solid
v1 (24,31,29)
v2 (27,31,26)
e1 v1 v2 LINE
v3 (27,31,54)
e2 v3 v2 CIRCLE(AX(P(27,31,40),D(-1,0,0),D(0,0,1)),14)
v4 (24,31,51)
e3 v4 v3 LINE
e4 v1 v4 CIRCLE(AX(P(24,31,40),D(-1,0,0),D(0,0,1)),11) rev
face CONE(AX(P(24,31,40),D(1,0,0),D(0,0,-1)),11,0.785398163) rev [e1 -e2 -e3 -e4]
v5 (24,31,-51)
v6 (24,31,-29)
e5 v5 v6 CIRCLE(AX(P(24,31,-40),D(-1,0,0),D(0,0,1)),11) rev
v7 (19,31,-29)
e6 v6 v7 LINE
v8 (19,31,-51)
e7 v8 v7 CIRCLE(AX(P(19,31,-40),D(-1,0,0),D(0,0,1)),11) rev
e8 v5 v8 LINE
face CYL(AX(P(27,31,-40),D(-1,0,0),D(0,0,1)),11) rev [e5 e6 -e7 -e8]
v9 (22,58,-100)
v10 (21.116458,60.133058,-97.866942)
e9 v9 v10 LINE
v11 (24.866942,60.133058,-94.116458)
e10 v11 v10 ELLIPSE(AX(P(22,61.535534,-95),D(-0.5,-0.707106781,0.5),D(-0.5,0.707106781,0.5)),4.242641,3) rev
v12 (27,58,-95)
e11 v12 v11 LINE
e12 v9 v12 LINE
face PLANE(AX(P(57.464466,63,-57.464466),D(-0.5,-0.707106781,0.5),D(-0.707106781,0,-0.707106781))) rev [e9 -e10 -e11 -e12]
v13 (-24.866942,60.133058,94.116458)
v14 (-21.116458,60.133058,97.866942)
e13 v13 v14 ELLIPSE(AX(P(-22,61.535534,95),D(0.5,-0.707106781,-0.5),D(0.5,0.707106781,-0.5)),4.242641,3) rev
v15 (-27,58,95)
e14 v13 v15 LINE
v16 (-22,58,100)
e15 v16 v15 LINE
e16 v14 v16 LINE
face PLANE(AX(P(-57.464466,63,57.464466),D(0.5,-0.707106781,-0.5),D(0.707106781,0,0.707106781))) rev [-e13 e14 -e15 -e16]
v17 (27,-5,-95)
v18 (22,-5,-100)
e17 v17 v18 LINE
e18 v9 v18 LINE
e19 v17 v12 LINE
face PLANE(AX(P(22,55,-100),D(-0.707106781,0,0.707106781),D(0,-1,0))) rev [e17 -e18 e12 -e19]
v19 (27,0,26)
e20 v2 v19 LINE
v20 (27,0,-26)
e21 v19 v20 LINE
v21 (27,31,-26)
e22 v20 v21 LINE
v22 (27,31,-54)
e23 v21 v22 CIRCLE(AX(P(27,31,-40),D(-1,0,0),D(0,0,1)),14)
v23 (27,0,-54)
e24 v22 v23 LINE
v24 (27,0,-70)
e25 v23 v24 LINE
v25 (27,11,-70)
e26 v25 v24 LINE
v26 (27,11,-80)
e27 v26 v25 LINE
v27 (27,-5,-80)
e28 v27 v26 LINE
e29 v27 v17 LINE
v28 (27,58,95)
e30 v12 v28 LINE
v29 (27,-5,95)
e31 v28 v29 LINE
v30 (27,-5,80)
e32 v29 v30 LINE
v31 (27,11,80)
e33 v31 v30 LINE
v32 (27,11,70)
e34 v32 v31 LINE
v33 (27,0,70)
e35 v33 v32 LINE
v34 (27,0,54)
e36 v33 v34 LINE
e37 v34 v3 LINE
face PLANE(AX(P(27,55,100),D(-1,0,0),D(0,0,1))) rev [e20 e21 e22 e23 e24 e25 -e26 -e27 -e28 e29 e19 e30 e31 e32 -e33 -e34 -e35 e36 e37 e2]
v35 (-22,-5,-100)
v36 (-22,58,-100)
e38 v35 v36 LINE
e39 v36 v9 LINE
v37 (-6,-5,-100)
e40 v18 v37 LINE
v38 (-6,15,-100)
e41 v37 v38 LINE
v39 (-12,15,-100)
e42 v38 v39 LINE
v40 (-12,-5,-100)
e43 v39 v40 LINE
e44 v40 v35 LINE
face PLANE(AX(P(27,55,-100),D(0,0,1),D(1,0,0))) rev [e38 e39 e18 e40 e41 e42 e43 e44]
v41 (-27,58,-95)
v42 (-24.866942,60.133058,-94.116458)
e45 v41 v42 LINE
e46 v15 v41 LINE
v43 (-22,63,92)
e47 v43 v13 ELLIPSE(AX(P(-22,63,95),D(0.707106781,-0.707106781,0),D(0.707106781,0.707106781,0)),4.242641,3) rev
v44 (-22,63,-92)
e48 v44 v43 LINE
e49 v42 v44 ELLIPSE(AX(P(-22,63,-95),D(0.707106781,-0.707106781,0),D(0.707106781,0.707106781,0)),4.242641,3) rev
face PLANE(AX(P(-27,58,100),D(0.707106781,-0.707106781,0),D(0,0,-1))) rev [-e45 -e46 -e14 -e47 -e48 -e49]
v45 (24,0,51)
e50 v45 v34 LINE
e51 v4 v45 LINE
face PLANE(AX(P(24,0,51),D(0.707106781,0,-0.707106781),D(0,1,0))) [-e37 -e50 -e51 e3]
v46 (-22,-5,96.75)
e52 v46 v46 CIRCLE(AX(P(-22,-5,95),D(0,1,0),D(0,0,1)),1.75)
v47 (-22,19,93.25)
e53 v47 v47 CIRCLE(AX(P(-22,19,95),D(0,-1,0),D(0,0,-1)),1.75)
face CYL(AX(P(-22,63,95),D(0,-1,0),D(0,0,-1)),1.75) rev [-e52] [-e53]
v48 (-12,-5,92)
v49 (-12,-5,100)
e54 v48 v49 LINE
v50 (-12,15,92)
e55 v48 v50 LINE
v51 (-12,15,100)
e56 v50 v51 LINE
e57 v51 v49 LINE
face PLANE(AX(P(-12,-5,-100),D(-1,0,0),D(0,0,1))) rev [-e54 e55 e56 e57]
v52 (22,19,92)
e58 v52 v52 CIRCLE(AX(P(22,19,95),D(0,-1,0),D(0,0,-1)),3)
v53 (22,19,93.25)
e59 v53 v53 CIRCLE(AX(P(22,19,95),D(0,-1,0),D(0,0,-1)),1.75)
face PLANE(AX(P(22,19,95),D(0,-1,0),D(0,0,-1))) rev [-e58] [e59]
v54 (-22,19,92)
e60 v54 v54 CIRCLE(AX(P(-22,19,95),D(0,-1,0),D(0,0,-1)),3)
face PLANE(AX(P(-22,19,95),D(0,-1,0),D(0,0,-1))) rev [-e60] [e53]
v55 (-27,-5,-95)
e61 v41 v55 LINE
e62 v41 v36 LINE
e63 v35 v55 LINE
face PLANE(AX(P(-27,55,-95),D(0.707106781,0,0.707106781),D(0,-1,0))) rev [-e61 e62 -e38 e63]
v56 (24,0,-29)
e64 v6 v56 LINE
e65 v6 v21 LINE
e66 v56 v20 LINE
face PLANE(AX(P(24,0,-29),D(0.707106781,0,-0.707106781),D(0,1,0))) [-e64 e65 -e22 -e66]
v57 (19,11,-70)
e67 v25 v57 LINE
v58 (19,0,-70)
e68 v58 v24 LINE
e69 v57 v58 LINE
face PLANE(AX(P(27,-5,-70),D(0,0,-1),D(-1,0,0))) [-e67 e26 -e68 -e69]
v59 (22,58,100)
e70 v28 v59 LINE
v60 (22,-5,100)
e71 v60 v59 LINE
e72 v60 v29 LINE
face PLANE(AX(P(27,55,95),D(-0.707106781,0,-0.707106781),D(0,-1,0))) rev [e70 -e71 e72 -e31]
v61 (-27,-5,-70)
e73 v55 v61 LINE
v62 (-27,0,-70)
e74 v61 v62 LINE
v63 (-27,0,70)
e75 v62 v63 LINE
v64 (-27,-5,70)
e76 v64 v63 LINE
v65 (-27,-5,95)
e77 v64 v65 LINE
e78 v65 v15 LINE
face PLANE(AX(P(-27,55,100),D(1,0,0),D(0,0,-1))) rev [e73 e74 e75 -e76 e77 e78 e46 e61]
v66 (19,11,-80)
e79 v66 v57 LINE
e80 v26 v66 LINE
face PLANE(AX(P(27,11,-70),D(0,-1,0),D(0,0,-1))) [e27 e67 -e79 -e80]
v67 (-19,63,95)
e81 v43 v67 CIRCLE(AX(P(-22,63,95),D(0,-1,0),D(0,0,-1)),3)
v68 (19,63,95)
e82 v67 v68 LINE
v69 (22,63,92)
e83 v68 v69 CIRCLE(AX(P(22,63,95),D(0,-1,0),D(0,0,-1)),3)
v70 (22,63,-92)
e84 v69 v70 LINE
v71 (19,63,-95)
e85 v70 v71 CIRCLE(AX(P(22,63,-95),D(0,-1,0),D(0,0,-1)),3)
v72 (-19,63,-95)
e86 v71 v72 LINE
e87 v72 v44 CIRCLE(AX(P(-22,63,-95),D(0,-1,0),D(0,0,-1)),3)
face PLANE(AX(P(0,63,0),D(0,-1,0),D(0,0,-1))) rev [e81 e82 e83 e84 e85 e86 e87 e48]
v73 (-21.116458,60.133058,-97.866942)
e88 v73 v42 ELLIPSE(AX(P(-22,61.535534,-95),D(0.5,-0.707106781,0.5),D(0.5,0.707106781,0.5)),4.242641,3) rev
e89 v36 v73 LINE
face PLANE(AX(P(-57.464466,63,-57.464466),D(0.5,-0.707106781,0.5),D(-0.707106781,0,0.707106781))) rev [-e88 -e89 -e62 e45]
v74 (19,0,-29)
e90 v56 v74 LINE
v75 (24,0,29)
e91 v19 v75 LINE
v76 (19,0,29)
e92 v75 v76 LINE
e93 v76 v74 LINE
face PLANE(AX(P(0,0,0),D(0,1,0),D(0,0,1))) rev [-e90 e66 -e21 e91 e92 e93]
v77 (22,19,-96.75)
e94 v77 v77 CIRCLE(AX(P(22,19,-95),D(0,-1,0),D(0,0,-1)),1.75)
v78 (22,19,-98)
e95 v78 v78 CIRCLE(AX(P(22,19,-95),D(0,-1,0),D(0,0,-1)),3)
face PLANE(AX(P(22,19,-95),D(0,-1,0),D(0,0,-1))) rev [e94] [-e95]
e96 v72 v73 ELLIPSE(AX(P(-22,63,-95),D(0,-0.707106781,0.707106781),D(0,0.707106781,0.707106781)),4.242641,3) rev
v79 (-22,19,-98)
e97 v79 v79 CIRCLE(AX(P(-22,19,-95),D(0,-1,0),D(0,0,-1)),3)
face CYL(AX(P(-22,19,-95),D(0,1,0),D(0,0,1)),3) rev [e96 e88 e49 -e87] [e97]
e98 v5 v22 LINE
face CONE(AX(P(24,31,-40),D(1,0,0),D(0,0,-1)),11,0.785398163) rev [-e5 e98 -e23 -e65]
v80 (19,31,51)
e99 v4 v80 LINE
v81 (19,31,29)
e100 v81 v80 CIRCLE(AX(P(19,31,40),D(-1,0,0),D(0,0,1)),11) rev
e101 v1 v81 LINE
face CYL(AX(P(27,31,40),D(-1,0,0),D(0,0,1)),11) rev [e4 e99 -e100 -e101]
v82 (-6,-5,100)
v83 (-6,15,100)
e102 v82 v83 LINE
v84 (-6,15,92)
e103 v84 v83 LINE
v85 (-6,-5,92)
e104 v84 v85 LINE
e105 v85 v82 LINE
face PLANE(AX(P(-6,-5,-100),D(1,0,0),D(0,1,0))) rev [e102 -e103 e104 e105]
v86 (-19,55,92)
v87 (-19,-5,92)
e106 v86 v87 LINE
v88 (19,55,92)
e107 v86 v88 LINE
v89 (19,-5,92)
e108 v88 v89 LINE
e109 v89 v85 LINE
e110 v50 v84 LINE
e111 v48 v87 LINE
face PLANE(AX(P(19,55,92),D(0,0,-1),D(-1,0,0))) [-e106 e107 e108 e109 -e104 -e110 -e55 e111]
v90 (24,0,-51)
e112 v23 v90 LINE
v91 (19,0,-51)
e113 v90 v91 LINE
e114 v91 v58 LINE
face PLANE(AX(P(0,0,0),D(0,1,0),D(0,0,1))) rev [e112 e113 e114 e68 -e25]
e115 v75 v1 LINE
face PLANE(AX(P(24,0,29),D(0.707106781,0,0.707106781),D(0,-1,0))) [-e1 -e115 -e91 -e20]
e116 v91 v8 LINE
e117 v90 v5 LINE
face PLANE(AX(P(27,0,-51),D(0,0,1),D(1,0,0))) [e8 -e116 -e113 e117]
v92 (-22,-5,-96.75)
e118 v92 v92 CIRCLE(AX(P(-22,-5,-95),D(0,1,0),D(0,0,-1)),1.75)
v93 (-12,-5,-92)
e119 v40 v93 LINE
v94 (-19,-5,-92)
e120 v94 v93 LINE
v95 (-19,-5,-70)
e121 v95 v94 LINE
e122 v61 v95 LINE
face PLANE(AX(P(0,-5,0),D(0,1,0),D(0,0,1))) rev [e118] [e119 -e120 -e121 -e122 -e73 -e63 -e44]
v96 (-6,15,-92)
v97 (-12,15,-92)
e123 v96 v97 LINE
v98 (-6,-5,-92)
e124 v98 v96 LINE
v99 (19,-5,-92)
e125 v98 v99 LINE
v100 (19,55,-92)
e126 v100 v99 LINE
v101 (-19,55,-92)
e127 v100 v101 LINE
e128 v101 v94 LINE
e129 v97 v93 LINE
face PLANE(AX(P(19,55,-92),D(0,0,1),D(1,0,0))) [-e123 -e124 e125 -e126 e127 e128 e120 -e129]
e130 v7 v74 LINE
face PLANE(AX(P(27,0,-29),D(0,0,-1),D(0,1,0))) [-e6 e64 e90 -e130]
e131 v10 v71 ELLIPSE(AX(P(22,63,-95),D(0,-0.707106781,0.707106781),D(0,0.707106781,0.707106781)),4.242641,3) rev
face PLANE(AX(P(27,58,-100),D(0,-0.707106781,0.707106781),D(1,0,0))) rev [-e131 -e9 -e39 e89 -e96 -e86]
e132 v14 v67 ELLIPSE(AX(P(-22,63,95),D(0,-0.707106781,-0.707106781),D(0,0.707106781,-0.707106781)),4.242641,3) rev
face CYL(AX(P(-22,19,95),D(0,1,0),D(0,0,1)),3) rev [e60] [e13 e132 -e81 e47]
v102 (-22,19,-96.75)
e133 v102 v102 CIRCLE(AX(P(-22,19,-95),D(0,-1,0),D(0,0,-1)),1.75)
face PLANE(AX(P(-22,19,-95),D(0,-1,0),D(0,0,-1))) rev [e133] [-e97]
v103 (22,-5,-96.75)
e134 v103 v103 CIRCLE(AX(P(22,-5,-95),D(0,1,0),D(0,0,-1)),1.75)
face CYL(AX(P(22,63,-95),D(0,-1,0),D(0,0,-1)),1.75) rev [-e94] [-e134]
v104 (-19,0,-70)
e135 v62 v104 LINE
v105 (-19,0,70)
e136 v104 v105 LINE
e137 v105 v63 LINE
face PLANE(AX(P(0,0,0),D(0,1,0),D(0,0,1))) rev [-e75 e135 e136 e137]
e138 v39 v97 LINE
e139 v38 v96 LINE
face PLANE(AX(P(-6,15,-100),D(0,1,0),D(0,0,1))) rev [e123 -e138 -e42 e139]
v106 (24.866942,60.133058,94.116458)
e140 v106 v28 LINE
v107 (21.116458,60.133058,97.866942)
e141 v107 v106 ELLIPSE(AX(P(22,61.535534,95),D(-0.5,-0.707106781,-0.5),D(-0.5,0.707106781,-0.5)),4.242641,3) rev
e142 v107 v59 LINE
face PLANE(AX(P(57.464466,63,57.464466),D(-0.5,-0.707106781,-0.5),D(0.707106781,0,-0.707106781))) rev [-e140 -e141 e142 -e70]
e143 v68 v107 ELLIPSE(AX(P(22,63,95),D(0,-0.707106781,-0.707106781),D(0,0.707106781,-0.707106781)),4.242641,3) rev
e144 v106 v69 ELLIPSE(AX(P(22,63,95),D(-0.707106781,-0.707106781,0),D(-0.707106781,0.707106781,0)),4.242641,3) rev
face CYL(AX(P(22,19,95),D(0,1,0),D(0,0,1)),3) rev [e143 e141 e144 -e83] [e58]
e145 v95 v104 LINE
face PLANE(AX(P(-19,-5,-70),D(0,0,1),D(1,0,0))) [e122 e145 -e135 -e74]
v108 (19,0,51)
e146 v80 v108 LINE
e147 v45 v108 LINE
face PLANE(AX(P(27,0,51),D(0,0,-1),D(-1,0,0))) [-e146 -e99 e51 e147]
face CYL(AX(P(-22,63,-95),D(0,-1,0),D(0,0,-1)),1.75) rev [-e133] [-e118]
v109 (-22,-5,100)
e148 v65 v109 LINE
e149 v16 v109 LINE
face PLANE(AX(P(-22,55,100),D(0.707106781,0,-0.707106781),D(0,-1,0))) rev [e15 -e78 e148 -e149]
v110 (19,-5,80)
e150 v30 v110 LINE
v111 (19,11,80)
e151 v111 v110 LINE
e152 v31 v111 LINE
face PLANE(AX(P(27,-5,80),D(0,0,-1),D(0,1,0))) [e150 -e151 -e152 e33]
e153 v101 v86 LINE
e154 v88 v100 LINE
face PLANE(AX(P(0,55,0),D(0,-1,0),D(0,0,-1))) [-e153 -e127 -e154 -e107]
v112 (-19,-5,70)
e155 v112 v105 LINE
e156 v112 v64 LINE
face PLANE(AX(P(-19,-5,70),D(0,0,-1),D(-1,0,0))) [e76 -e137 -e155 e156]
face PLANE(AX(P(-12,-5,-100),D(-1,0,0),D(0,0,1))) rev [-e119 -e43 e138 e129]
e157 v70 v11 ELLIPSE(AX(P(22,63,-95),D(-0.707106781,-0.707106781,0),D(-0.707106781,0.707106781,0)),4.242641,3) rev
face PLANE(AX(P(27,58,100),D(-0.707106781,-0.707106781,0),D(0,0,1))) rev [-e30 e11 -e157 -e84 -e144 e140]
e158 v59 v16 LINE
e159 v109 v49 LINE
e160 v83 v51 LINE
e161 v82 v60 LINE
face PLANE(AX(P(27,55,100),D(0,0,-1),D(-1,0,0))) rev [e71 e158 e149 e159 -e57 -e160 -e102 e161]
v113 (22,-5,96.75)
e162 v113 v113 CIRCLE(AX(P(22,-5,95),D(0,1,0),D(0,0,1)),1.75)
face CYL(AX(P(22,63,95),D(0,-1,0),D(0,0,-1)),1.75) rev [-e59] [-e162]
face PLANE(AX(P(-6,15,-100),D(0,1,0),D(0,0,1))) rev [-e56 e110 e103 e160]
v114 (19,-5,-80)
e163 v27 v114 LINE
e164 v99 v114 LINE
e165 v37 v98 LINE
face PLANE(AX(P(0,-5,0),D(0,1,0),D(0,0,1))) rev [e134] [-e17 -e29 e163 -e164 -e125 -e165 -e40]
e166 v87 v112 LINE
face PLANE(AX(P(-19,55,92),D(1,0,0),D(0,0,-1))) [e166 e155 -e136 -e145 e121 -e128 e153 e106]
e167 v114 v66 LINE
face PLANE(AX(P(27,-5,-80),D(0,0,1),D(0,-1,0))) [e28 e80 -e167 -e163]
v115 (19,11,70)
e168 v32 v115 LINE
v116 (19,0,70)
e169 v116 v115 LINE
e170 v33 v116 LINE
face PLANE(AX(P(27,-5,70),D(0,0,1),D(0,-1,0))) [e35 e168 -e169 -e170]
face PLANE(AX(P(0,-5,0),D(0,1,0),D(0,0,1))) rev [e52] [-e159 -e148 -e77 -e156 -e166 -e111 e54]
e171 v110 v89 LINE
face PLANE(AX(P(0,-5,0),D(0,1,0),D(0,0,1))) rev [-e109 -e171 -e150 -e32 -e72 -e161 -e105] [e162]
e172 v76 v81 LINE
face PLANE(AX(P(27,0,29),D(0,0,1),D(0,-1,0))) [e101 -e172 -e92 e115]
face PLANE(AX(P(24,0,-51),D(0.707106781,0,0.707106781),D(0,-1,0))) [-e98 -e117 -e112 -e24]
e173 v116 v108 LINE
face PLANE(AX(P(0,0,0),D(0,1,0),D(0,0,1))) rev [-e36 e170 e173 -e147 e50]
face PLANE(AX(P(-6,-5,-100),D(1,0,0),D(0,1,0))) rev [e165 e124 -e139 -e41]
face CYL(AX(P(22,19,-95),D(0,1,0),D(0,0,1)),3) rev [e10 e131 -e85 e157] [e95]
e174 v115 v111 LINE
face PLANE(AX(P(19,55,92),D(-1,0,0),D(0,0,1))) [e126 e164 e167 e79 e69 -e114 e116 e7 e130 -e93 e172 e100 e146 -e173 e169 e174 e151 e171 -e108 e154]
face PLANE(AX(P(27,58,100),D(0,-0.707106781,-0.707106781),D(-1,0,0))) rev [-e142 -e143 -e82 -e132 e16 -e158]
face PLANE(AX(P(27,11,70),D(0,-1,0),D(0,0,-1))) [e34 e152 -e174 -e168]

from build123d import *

# Parameters (mm, degrees)
SKETCH2_W               = 54
SKETCH2_H               = 200
SKETCH2_W_2             = 38
SKETCH2_H_2             = 184
BOSS_EXTRUDE2_DEPTH     = 55
CUT_EXTRUDE1_DEPTH      = 118.277448813
BOSS_EXTRUDE3_START     = 55
SKETCH5_W               = 54
SKETCH5_H               = 200
BOSS_EXTRUDE3_DEPTH     = 8
CUT_EXTRUDE2_DEPTH      = 122.235308388
CUT_EXTRUDE2_DEPTH_BACK = 122.235308388
SKETCH6_R               = 1.75
CUT_EXTRUDE3_START      = 63
SKETCH7_R               = 3
CUT_EXTRUDE3_DEPTH      = 44
CHAMFER1_SIZE           = 5
CHAMFER3_SIZE           = 5
CHAMFER4_SIZE           = 3
BOSS_EXTRUDE4_START     = -5
SKETCH8_R               = 1.75
BOSS_EXTRUDE4_DEPTH     = 5
CUT_EXTRUDE4_DEPTH      = 122.235308388
CUT_EXTRUDE4_DEPTH_BACK = 122.235308388
SKETCH9_W               = 6
SKETCH9_H               = 20
SKETCH10_W              = 10
SKETCH10_H              = 16
CUT_EXTRUDE5_DEPTH      = 122.235308388


with BuildPart() as part:
    # Sketch2 → Boss-Extrude2 (new body)
    with BuildSketch(Plane(origin=(0, 0, 0), x_dir=(1, 0, 0), z_dir=(0, 1, 0))):
        Rectangle(SKETCH2_W, SKETCH2_H)
        Rectangle(SKETCH2_W_2, SKETCH2_H_2, mode=Mode.SUBTRACT)
    extrude(amount=BOSS_EXTRUDE2_DEPTH)

    # Sketch3 → Cut-Extrude1 (cut, through all)
    with BuildSketch(Plane(origin=(0, 0, 0), x_dir=(0, 0, -1), z_dir=(1, 0, 0))):
        with BuildLine():
            Line((-51, 0), (-51, 31))
            ThreePointArc((-51, 31), (-40, 42), (-29, 31))
            Line((-29, 31), (-29, 0))
            Line((-29, 0), (-51, 0))
        make_face()
        with BuildLine():
            Line((51, 0), (51, 31))
            ThreePointArc((51, 31), (40, 42), (29, 31))
            Line((29, 31), (29, 0))
            Line((29, 0), (51, 0))
        make_face()
    extrude(amount=CUT_EXTRUDE1_DEPTH, mode=Mode.SUBTRACT)

    # Sketch5 → Boss-Extrude3 (add)
    with BuildSketch(Plane(origin=(0, 0, 0), x_dir=(1, 0, 0), z_dir=(0, 1, 0)).offset(BOSS_EXTRUDE3_START)):
        Rectangle(SKETCH5_W, SKETCH5_H)
    extrude(amount=BOSS_EXTRUDE3_DEPTH)

    # Sketch6 → Cut-Extrude2 (cut, two sides: drawn at the far end of the back side and taken through both)
    with BuildSketch(Plane(origin=(0, 0, 0), x_dir=(1, 0, 0), z_dir=(0, 1, 0)).offset(-CUT_EXTRUDE2_DEPTH_BACK)):
        with Locations(Location((22, -95, 0), (0, 0, 270))):
            Circle(SKETCH6_R)
        with Locations(Location((-22, -95, 0), (0, 0, 270))):
            Circle(SKETCH6_R)
        with Locations(Location((-22, 95, 0), (0, 0, 270))):
            Circle(SKETCH6_R)
        with Locations(Location((22, 95, 0), (0, 0, 270))):
            Circle(SKETCH6_R)
    extrude(amount=CUT_EXTRUDE2_DEPTH + CUT_EXTRUDE2_DEPTH_BACK, mode=Mode.SUBTRACT)

    # Sketch7 → Cut-Extrude3 (cut)
    with BuildSketch(Plane(origin=(0, 0, 0), x_dir=(1, 0, 0), z_dir=(0, 1, 0)).offset(CUT_EXTRUDE3_START)):
        with Locations(Location((-22, -95, 0), (0, 0, 90))):
            Circle(SKETCH7_R)
        with Locations(Location((-22, 95, 0), (0, 0, 90))):
            Circle(SKETCH7_R)
        with Locations(Location((22, 95, 0), (0, 0, 90))):
            Circle(SKETCH7_R)
        with Locations(Location((22, -95, 0), (0, 0, 90))):
            Circle(SKETCH7_R)
    extrude(amount=-CUT_EXTRUDE3_DEPTH, mode=Mode.SUBTRACT)

    # Chamfer1
    chamfer1_edges = [part.edges().sort_by_distance(p)[0] for p in [
        (-27, 31.5, -100),
        (27, 31.5, -100),
        (27, 31.5, 100),
        (-27, 31.5, 100),
    ]]
    chamfer(chamfer1_edges, length=CHAMFER1_SIZE)

    # Chamfer3
    # the kernel refuses this chamfer: 5 mm, written as the material it takes off along each edge
    with BuildSketch(Plane(origin=(-34.85841494, 63, 100), x_dir=(0, -0.9996219169112968, 0.0274958766105877), z_dir=(1, 0, 0))) as chamfer3_piece_1:
        Polygon((CHAMFER3_SIZE * 0.999621916911, CHAMFER3_SIZE * 0.0274958766106), (-CHAMFER3_SIZE * 0.0274958766106, CHAMFER3_SIZE * 0.999621916911), (0, 0), align=None)
    extrude(amount=69.71682988, mode=Mode.SUBTRACT)
    with BuildSketch(Plane(origin=(-27, 63, -107.85841494), x_dir=(0.9996219169112968, 0.027495876610586317, 0), z_dir=(0, 0, 1)), Plane(origin=(27, 63, 107.85841494), x_dir=(-0.9996219169112968, 0.027495876610586317, 0), z_dir=(0, 0, -1))) as chamfer3_piece_2:
        Polygon((CHAMFER3_SIZE * 0.999621916911, -CHAMFER3_SIZE * 0.0274958766106), (-CHAMFER3_SIZE * 0.0274958766106, -CHAMFER3_SIZE * 0.999621916911), (0, 0), align=None)
    extrude(amount=215.71682988, mode=Mode.SUBTRACT)
    with BuildSketch(Plane(origin=(34.85841494, 63, -100), x_dir=(0, 0.027495876610586282, 0.9996219169112968), z_dir=(-1, 0, 0))) as chamfer3_piece_3:
        Polygon((CHAMFER3_SIZE * 0.999621916911, -CHAMFER3_SIZE * 0.0274958766106), (-CHAMFER3_SIZE * 0.0274958766106, -CHAMFER3_SIZE * 0.999621916911), (0, 0), align=None)
    extrude(amount=69.71682988, mode=Mode.SUBTRACT)
    with BuildSketch(Plane(origin=(12.907727601, 63, 109.092272399), x_dir=(-0.7068394360706735, 0.027495876610586337, -0.7068394360706735), z_dir=(0.7071067811865476, 0, -0.7071067811865476)), Plane(origin=(36.092272399, 63, -85.907727601), x_dir=(-0.7068394360706735, 0.027495876610586334, 0.7068394360706735), z_dir=(-0.7071067811865476, 0, -0.7071067811865476))) as chamfer3_piece_4:
        Polygon((CHAMFER3_SIZE * 0.999621916911, -CHAMFER3_SIZE * 0.0274958766106), (-CHAMFER3_SIZE * 0.0274958766106, -CHAMFER3_SIZE * 0.999621916911), (0, 0), align=None)
    extrude(amount=32.787897692, mode=Mode.SUBTRACT)
    with BuildSketch(Plane(origin=(-36.092272399, 63, -85.907727601), x_dir=(0.7068394360706735, 0.027495876610586334, 0.7068394360706735), z_dir=(0.7071067811865476, 0, -0.7071067811865476)), Plane(origin=(-12.907727601, 63, 109.092272399), x_dir=(0.7068394360706735, 0.027495876610586337, -0.7068394360706735), z_dir=(-0.7071067811865476, 0, -0.7071067811865476))) as chamfer3_piece_5:
        Polygon((CHAMFER3_SIZE * 0.999621916911, CHAMFER3_SIZE * 0.0274958766106), (-CHAMFER3_SIZE * 0.0274958766106, CHAMFER3_SIZE * 0.999621916911), (0, 0), align=None)
    extrude(amount=32.787897692, mode=Mode.SUBTRACT)

    # Chamfer4
    chamfer4_edges = [part.edges().sort_by_distance(p)[0] for p in [
        (27, 15.5, 29),
        (27, 42, 40),
        (27, 15.5, 51),
        (27, 15.5, -51),
        (27, 42, -40),
        (27, 15.5, -29),
    ]]
    chamfer(chamfer4_edges, length=CHAMFER4_SIZE)

    # Sketch8 → Boss-Extrude4 (add)
    # profile 1 of 2: a face of its own
    with BuildSketch(Plane(origin=(0, 0, 0), x_dir=(1, 0, 0), z_dir=(0, 1, 0)).offset(BOSS_EXTRUDE4_START)):
        Polygon((27, -70), (19, -70), (19, -92), (-19, -92), (-19, -70), (-27, -70), (-27, -95), (-22, -100), (22, -100), (27, -95), align=None)
        with Locations(Location((22, -95, 0), (0, 0, 90))):
            Circle(SKETCH8_R, mode=Mode.SUBTRACT)
        with Locations(Location((-22, -95, 0), (0, 0, 90))):
            Circle(SKETCH8_R, mode=Mode.SUBTRACT)
    # profile 2 of 2: a face of its own
    with BuildSketch(Plane(origin=(0, 0, 0), x_dir=(1, 0, 0), z_dir=(0, 1, 0)).offset(BOSS_EXTRUDE4_START)):
        Polygon((27, 95), (27, 70), (19, 70), (19, 92), (-19, 92), (-19, 70), (-27, 70), (-27, 95), (-22, 100), (22, 100), align=None)
        with Locations(Location((-22, 95, 0), (0, 0, 90))):
            Circle(SKETCH8_R, mode=Mode.SUBTRACT)
        with Locations(Location((22, 95, 0), (0, 0, 90))):
            Circle(SKETCH8_R, mode=Mode.SUBTRACT)
    extrude(amount=BOSS_EXTRUDE4_DEPTH)

    # Sketch9 → Cut-Extrude4 (cut, two sides: drawn at the far end of the back side and taken through both)
    with BuildSketch(Plane.XY.offset(-CUT_EXTRUDE4_DEPTH_BACK)):
        with Locations((-9, 5)):
            Rectangle(SKETCH9_W, SKETCH9_H)
    extrude(amount=CUT_EXTRUDE4_DEPTH + CUT_EXTRUDE4_DEPTH_BACK, mode=Mode.SUBTRACT)

    # Sketch10 → Cut-Extrude5 (cut, through all)
    with BuildSketch(Plane(origin=(0, 0, 0), x_dir=(0, 0, -1), z_dir=(1, 0, 0))):
        with Locations((-75, 3)):
            Rectangle(SKETCH10_W, SKETCH10_H)
        with Locations((75, 3)):
            Rectangle(SKETCH10_W, SKETCH10_H)
    extrude(amount=CUT_EXTRUDE5_DEPTH, mode=Mode.SUBTRACT)


solid = part.part
